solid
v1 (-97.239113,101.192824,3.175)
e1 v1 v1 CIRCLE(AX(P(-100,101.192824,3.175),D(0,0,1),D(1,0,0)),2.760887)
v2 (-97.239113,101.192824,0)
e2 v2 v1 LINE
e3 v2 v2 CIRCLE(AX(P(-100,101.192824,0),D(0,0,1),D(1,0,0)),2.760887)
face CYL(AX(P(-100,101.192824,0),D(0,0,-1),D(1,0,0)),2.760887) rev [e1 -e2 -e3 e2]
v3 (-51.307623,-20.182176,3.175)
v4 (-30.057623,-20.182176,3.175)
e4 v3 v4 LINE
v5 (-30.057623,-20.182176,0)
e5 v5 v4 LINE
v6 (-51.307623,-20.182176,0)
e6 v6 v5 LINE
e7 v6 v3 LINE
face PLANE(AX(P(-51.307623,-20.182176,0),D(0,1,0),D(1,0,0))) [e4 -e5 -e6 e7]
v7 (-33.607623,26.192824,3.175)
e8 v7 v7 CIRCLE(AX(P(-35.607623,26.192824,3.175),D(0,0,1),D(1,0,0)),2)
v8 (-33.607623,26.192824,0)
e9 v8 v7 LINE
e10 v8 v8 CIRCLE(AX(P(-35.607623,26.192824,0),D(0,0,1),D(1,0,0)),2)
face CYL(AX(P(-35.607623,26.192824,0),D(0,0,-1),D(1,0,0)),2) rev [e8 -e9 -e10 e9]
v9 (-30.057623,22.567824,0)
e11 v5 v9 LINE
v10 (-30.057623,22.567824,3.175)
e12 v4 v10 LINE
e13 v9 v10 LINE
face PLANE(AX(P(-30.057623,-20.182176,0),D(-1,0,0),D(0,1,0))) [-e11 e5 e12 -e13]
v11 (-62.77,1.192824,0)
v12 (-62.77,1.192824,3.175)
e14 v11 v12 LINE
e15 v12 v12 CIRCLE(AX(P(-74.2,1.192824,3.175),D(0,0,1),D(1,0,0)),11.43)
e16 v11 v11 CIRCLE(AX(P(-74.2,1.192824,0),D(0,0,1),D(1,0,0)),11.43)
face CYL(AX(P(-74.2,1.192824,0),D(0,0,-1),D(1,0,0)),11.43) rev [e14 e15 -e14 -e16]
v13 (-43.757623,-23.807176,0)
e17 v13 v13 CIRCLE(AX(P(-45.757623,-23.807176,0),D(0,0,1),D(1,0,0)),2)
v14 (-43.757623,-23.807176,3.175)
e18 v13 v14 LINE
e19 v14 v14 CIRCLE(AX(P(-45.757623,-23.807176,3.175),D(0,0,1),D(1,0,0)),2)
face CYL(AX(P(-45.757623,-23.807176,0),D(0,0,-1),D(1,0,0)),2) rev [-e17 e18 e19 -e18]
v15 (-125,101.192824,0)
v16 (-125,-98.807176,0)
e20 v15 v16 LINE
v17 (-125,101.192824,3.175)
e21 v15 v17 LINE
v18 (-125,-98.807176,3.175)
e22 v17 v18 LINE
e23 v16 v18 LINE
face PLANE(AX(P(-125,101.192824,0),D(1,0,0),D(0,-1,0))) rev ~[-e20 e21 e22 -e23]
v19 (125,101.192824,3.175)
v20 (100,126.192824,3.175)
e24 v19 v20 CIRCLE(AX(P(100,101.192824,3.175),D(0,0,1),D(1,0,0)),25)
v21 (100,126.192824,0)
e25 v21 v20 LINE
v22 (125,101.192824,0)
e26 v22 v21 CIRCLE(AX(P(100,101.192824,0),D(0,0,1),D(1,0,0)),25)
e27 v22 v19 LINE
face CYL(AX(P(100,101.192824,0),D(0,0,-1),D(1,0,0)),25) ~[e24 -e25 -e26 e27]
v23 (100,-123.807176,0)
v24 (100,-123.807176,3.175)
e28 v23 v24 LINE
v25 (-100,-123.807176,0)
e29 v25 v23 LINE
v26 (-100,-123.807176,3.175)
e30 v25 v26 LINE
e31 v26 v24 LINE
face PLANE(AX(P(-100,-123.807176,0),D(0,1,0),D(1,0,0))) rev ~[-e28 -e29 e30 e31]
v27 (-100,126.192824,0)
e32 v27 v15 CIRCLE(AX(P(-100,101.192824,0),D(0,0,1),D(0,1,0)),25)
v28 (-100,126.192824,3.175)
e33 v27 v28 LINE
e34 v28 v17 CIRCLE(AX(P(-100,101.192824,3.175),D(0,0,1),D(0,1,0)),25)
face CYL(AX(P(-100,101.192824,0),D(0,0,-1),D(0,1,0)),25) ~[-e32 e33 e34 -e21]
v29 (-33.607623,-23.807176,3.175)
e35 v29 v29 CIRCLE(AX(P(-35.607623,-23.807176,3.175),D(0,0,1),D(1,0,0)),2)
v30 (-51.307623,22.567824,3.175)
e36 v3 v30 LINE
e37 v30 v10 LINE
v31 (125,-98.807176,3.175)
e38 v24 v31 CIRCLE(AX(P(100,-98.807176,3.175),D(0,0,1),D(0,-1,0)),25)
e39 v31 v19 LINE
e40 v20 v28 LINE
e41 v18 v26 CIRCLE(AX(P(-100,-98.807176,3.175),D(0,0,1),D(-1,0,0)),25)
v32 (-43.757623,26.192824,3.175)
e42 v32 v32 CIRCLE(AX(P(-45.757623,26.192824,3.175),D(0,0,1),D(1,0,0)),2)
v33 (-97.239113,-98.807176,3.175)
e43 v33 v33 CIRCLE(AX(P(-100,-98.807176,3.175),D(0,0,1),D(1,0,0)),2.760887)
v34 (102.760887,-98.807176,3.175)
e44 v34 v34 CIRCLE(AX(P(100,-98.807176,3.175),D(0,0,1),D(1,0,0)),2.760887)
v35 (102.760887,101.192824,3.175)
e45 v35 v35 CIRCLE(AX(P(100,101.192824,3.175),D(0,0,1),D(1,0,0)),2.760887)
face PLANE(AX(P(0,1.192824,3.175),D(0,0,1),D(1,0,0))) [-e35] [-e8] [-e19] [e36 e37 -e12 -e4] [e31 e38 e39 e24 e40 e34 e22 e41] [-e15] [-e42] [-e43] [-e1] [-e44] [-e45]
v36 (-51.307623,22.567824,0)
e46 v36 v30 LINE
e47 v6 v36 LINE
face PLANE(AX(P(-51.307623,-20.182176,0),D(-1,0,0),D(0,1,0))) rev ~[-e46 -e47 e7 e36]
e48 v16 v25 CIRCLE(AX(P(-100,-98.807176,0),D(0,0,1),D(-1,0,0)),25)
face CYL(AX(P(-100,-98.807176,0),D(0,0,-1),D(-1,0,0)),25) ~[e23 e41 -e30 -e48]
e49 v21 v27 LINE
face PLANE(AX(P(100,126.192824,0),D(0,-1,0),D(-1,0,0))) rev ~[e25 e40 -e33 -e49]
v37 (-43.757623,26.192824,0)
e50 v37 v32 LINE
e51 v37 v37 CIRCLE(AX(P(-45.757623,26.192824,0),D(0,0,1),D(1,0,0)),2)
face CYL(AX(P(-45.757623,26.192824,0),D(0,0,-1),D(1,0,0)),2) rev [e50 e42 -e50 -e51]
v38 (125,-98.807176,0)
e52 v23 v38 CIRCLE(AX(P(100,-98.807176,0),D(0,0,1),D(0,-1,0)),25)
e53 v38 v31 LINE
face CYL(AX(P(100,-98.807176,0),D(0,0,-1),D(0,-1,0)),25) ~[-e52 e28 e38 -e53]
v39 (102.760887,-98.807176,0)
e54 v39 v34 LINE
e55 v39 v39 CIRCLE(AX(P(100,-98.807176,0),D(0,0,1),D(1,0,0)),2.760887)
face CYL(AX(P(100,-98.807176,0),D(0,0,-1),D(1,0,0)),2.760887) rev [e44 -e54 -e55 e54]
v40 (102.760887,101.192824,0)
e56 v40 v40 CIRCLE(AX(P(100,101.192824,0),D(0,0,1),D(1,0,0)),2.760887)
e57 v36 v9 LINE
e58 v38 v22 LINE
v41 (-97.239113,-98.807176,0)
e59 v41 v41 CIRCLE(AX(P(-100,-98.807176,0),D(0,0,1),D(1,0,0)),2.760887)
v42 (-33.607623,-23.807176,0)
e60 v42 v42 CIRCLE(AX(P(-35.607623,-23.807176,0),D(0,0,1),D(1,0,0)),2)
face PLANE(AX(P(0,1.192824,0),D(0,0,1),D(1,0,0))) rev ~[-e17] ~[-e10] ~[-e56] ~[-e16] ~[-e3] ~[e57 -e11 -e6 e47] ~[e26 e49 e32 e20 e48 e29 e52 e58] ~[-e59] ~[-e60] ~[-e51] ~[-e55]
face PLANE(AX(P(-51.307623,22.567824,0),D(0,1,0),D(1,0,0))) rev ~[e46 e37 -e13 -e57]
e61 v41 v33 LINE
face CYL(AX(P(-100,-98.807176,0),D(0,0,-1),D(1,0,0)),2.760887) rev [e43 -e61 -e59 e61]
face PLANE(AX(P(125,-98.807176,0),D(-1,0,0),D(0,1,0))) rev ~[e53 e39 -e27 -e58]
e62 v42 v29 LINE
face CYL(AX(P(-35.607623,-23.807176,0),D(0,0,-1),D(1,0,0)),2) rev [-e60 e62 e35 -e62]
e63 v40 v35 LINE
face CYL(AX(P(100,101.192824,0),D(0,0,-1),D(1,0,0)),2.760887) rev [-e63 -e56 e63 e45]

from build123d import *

# Parameters (mm, degrees)
F0_R     = 2.7608867496
F0_R_2   = 2
F0_W     = 21.25
F0_H     = 42.75
F0_R_3   = 11.43
F1_DEPTH = 3.175


# Not quite as in the source:
# - a length typed as a fraction of an inch, garbled in the dataset ("3 / 203.2 mm" for 3/8 in), is restored


with BuildPart() as f1:
    # F0 (on Top) → F1 (new body)
    with BuildSketch(Plane.XY):
        with BuildLine():
            Line((100, 126.1928240007), (-100, 126.1928240007))
            ThreePointArc((-100, 126.1928240007), (-117.6776695297, 118.8704935303), (-125, 101.1928240007))
            Line((-125, 101.1928240007), (-125, -98.8071759993))
            ThreePointArc((-125, -98.8071759993), (-117.6776695297, -116.484845529), (-100, -123.8071759993))
            Line((-100, -123.8071759993), (100, -123.8071759993))
            ThreePointArc((100, -123.8071759993), (117.6776695297, -116.484845529), (125, -98.8071759993))
            Line((125, -98.8071759993), (125, 101.1928240007))
            ThreePointArc((125, 101.1928240007), (117.6776695297, 118.8704935303), (100, 126.1928240007))
        make_face()
        with Locations((-100, -98.8071759993)):
            Circle(F0_R, mode=Mode.SUBTRACT)
        with Locations((-45.7576233894, -23.8071759993)):
            Circle(F0_R_2, mode=Mode.SUBTRACT)
        with Locations((-35.6076233894, -23.8071759993)):
            Circle(F0_R_2, mode=Mode.SUBTRACT)
        with Locations((-40.6826233894, 1.1928240007)):
            Rectangle(F0_W, F0_H, mode=Mode.SUBTRACT)
        with Locations((100, -98.8071759993)):
            Circle(F0_R, mode=Mode.SUBTRACT)
        with Locations((-74.2, 1.1928240007)):
            Circle(F0_R_3, mode=Mode.SUBTRACT)
        with Locations((-45.7576233894, 26.1928240007)):
            Circle(F0_R_2, mode=Mode.SUBTRACT)
        with Locations((-35.6076233894, 26.1928240007)):
            Circle(F0_R_2, mode=Mode.SUBTRACT)
        with Locations((-100, 101.1928240007)):
            Circle(F0_R, mode=Mode.SUBTRACT)
        with Locations((100, 101.1928240007)):
            Circle(F0_R, mode=Mode.SUBTRACT)
    extrude(amount=F1_DEPTH)


solid = f1.part
